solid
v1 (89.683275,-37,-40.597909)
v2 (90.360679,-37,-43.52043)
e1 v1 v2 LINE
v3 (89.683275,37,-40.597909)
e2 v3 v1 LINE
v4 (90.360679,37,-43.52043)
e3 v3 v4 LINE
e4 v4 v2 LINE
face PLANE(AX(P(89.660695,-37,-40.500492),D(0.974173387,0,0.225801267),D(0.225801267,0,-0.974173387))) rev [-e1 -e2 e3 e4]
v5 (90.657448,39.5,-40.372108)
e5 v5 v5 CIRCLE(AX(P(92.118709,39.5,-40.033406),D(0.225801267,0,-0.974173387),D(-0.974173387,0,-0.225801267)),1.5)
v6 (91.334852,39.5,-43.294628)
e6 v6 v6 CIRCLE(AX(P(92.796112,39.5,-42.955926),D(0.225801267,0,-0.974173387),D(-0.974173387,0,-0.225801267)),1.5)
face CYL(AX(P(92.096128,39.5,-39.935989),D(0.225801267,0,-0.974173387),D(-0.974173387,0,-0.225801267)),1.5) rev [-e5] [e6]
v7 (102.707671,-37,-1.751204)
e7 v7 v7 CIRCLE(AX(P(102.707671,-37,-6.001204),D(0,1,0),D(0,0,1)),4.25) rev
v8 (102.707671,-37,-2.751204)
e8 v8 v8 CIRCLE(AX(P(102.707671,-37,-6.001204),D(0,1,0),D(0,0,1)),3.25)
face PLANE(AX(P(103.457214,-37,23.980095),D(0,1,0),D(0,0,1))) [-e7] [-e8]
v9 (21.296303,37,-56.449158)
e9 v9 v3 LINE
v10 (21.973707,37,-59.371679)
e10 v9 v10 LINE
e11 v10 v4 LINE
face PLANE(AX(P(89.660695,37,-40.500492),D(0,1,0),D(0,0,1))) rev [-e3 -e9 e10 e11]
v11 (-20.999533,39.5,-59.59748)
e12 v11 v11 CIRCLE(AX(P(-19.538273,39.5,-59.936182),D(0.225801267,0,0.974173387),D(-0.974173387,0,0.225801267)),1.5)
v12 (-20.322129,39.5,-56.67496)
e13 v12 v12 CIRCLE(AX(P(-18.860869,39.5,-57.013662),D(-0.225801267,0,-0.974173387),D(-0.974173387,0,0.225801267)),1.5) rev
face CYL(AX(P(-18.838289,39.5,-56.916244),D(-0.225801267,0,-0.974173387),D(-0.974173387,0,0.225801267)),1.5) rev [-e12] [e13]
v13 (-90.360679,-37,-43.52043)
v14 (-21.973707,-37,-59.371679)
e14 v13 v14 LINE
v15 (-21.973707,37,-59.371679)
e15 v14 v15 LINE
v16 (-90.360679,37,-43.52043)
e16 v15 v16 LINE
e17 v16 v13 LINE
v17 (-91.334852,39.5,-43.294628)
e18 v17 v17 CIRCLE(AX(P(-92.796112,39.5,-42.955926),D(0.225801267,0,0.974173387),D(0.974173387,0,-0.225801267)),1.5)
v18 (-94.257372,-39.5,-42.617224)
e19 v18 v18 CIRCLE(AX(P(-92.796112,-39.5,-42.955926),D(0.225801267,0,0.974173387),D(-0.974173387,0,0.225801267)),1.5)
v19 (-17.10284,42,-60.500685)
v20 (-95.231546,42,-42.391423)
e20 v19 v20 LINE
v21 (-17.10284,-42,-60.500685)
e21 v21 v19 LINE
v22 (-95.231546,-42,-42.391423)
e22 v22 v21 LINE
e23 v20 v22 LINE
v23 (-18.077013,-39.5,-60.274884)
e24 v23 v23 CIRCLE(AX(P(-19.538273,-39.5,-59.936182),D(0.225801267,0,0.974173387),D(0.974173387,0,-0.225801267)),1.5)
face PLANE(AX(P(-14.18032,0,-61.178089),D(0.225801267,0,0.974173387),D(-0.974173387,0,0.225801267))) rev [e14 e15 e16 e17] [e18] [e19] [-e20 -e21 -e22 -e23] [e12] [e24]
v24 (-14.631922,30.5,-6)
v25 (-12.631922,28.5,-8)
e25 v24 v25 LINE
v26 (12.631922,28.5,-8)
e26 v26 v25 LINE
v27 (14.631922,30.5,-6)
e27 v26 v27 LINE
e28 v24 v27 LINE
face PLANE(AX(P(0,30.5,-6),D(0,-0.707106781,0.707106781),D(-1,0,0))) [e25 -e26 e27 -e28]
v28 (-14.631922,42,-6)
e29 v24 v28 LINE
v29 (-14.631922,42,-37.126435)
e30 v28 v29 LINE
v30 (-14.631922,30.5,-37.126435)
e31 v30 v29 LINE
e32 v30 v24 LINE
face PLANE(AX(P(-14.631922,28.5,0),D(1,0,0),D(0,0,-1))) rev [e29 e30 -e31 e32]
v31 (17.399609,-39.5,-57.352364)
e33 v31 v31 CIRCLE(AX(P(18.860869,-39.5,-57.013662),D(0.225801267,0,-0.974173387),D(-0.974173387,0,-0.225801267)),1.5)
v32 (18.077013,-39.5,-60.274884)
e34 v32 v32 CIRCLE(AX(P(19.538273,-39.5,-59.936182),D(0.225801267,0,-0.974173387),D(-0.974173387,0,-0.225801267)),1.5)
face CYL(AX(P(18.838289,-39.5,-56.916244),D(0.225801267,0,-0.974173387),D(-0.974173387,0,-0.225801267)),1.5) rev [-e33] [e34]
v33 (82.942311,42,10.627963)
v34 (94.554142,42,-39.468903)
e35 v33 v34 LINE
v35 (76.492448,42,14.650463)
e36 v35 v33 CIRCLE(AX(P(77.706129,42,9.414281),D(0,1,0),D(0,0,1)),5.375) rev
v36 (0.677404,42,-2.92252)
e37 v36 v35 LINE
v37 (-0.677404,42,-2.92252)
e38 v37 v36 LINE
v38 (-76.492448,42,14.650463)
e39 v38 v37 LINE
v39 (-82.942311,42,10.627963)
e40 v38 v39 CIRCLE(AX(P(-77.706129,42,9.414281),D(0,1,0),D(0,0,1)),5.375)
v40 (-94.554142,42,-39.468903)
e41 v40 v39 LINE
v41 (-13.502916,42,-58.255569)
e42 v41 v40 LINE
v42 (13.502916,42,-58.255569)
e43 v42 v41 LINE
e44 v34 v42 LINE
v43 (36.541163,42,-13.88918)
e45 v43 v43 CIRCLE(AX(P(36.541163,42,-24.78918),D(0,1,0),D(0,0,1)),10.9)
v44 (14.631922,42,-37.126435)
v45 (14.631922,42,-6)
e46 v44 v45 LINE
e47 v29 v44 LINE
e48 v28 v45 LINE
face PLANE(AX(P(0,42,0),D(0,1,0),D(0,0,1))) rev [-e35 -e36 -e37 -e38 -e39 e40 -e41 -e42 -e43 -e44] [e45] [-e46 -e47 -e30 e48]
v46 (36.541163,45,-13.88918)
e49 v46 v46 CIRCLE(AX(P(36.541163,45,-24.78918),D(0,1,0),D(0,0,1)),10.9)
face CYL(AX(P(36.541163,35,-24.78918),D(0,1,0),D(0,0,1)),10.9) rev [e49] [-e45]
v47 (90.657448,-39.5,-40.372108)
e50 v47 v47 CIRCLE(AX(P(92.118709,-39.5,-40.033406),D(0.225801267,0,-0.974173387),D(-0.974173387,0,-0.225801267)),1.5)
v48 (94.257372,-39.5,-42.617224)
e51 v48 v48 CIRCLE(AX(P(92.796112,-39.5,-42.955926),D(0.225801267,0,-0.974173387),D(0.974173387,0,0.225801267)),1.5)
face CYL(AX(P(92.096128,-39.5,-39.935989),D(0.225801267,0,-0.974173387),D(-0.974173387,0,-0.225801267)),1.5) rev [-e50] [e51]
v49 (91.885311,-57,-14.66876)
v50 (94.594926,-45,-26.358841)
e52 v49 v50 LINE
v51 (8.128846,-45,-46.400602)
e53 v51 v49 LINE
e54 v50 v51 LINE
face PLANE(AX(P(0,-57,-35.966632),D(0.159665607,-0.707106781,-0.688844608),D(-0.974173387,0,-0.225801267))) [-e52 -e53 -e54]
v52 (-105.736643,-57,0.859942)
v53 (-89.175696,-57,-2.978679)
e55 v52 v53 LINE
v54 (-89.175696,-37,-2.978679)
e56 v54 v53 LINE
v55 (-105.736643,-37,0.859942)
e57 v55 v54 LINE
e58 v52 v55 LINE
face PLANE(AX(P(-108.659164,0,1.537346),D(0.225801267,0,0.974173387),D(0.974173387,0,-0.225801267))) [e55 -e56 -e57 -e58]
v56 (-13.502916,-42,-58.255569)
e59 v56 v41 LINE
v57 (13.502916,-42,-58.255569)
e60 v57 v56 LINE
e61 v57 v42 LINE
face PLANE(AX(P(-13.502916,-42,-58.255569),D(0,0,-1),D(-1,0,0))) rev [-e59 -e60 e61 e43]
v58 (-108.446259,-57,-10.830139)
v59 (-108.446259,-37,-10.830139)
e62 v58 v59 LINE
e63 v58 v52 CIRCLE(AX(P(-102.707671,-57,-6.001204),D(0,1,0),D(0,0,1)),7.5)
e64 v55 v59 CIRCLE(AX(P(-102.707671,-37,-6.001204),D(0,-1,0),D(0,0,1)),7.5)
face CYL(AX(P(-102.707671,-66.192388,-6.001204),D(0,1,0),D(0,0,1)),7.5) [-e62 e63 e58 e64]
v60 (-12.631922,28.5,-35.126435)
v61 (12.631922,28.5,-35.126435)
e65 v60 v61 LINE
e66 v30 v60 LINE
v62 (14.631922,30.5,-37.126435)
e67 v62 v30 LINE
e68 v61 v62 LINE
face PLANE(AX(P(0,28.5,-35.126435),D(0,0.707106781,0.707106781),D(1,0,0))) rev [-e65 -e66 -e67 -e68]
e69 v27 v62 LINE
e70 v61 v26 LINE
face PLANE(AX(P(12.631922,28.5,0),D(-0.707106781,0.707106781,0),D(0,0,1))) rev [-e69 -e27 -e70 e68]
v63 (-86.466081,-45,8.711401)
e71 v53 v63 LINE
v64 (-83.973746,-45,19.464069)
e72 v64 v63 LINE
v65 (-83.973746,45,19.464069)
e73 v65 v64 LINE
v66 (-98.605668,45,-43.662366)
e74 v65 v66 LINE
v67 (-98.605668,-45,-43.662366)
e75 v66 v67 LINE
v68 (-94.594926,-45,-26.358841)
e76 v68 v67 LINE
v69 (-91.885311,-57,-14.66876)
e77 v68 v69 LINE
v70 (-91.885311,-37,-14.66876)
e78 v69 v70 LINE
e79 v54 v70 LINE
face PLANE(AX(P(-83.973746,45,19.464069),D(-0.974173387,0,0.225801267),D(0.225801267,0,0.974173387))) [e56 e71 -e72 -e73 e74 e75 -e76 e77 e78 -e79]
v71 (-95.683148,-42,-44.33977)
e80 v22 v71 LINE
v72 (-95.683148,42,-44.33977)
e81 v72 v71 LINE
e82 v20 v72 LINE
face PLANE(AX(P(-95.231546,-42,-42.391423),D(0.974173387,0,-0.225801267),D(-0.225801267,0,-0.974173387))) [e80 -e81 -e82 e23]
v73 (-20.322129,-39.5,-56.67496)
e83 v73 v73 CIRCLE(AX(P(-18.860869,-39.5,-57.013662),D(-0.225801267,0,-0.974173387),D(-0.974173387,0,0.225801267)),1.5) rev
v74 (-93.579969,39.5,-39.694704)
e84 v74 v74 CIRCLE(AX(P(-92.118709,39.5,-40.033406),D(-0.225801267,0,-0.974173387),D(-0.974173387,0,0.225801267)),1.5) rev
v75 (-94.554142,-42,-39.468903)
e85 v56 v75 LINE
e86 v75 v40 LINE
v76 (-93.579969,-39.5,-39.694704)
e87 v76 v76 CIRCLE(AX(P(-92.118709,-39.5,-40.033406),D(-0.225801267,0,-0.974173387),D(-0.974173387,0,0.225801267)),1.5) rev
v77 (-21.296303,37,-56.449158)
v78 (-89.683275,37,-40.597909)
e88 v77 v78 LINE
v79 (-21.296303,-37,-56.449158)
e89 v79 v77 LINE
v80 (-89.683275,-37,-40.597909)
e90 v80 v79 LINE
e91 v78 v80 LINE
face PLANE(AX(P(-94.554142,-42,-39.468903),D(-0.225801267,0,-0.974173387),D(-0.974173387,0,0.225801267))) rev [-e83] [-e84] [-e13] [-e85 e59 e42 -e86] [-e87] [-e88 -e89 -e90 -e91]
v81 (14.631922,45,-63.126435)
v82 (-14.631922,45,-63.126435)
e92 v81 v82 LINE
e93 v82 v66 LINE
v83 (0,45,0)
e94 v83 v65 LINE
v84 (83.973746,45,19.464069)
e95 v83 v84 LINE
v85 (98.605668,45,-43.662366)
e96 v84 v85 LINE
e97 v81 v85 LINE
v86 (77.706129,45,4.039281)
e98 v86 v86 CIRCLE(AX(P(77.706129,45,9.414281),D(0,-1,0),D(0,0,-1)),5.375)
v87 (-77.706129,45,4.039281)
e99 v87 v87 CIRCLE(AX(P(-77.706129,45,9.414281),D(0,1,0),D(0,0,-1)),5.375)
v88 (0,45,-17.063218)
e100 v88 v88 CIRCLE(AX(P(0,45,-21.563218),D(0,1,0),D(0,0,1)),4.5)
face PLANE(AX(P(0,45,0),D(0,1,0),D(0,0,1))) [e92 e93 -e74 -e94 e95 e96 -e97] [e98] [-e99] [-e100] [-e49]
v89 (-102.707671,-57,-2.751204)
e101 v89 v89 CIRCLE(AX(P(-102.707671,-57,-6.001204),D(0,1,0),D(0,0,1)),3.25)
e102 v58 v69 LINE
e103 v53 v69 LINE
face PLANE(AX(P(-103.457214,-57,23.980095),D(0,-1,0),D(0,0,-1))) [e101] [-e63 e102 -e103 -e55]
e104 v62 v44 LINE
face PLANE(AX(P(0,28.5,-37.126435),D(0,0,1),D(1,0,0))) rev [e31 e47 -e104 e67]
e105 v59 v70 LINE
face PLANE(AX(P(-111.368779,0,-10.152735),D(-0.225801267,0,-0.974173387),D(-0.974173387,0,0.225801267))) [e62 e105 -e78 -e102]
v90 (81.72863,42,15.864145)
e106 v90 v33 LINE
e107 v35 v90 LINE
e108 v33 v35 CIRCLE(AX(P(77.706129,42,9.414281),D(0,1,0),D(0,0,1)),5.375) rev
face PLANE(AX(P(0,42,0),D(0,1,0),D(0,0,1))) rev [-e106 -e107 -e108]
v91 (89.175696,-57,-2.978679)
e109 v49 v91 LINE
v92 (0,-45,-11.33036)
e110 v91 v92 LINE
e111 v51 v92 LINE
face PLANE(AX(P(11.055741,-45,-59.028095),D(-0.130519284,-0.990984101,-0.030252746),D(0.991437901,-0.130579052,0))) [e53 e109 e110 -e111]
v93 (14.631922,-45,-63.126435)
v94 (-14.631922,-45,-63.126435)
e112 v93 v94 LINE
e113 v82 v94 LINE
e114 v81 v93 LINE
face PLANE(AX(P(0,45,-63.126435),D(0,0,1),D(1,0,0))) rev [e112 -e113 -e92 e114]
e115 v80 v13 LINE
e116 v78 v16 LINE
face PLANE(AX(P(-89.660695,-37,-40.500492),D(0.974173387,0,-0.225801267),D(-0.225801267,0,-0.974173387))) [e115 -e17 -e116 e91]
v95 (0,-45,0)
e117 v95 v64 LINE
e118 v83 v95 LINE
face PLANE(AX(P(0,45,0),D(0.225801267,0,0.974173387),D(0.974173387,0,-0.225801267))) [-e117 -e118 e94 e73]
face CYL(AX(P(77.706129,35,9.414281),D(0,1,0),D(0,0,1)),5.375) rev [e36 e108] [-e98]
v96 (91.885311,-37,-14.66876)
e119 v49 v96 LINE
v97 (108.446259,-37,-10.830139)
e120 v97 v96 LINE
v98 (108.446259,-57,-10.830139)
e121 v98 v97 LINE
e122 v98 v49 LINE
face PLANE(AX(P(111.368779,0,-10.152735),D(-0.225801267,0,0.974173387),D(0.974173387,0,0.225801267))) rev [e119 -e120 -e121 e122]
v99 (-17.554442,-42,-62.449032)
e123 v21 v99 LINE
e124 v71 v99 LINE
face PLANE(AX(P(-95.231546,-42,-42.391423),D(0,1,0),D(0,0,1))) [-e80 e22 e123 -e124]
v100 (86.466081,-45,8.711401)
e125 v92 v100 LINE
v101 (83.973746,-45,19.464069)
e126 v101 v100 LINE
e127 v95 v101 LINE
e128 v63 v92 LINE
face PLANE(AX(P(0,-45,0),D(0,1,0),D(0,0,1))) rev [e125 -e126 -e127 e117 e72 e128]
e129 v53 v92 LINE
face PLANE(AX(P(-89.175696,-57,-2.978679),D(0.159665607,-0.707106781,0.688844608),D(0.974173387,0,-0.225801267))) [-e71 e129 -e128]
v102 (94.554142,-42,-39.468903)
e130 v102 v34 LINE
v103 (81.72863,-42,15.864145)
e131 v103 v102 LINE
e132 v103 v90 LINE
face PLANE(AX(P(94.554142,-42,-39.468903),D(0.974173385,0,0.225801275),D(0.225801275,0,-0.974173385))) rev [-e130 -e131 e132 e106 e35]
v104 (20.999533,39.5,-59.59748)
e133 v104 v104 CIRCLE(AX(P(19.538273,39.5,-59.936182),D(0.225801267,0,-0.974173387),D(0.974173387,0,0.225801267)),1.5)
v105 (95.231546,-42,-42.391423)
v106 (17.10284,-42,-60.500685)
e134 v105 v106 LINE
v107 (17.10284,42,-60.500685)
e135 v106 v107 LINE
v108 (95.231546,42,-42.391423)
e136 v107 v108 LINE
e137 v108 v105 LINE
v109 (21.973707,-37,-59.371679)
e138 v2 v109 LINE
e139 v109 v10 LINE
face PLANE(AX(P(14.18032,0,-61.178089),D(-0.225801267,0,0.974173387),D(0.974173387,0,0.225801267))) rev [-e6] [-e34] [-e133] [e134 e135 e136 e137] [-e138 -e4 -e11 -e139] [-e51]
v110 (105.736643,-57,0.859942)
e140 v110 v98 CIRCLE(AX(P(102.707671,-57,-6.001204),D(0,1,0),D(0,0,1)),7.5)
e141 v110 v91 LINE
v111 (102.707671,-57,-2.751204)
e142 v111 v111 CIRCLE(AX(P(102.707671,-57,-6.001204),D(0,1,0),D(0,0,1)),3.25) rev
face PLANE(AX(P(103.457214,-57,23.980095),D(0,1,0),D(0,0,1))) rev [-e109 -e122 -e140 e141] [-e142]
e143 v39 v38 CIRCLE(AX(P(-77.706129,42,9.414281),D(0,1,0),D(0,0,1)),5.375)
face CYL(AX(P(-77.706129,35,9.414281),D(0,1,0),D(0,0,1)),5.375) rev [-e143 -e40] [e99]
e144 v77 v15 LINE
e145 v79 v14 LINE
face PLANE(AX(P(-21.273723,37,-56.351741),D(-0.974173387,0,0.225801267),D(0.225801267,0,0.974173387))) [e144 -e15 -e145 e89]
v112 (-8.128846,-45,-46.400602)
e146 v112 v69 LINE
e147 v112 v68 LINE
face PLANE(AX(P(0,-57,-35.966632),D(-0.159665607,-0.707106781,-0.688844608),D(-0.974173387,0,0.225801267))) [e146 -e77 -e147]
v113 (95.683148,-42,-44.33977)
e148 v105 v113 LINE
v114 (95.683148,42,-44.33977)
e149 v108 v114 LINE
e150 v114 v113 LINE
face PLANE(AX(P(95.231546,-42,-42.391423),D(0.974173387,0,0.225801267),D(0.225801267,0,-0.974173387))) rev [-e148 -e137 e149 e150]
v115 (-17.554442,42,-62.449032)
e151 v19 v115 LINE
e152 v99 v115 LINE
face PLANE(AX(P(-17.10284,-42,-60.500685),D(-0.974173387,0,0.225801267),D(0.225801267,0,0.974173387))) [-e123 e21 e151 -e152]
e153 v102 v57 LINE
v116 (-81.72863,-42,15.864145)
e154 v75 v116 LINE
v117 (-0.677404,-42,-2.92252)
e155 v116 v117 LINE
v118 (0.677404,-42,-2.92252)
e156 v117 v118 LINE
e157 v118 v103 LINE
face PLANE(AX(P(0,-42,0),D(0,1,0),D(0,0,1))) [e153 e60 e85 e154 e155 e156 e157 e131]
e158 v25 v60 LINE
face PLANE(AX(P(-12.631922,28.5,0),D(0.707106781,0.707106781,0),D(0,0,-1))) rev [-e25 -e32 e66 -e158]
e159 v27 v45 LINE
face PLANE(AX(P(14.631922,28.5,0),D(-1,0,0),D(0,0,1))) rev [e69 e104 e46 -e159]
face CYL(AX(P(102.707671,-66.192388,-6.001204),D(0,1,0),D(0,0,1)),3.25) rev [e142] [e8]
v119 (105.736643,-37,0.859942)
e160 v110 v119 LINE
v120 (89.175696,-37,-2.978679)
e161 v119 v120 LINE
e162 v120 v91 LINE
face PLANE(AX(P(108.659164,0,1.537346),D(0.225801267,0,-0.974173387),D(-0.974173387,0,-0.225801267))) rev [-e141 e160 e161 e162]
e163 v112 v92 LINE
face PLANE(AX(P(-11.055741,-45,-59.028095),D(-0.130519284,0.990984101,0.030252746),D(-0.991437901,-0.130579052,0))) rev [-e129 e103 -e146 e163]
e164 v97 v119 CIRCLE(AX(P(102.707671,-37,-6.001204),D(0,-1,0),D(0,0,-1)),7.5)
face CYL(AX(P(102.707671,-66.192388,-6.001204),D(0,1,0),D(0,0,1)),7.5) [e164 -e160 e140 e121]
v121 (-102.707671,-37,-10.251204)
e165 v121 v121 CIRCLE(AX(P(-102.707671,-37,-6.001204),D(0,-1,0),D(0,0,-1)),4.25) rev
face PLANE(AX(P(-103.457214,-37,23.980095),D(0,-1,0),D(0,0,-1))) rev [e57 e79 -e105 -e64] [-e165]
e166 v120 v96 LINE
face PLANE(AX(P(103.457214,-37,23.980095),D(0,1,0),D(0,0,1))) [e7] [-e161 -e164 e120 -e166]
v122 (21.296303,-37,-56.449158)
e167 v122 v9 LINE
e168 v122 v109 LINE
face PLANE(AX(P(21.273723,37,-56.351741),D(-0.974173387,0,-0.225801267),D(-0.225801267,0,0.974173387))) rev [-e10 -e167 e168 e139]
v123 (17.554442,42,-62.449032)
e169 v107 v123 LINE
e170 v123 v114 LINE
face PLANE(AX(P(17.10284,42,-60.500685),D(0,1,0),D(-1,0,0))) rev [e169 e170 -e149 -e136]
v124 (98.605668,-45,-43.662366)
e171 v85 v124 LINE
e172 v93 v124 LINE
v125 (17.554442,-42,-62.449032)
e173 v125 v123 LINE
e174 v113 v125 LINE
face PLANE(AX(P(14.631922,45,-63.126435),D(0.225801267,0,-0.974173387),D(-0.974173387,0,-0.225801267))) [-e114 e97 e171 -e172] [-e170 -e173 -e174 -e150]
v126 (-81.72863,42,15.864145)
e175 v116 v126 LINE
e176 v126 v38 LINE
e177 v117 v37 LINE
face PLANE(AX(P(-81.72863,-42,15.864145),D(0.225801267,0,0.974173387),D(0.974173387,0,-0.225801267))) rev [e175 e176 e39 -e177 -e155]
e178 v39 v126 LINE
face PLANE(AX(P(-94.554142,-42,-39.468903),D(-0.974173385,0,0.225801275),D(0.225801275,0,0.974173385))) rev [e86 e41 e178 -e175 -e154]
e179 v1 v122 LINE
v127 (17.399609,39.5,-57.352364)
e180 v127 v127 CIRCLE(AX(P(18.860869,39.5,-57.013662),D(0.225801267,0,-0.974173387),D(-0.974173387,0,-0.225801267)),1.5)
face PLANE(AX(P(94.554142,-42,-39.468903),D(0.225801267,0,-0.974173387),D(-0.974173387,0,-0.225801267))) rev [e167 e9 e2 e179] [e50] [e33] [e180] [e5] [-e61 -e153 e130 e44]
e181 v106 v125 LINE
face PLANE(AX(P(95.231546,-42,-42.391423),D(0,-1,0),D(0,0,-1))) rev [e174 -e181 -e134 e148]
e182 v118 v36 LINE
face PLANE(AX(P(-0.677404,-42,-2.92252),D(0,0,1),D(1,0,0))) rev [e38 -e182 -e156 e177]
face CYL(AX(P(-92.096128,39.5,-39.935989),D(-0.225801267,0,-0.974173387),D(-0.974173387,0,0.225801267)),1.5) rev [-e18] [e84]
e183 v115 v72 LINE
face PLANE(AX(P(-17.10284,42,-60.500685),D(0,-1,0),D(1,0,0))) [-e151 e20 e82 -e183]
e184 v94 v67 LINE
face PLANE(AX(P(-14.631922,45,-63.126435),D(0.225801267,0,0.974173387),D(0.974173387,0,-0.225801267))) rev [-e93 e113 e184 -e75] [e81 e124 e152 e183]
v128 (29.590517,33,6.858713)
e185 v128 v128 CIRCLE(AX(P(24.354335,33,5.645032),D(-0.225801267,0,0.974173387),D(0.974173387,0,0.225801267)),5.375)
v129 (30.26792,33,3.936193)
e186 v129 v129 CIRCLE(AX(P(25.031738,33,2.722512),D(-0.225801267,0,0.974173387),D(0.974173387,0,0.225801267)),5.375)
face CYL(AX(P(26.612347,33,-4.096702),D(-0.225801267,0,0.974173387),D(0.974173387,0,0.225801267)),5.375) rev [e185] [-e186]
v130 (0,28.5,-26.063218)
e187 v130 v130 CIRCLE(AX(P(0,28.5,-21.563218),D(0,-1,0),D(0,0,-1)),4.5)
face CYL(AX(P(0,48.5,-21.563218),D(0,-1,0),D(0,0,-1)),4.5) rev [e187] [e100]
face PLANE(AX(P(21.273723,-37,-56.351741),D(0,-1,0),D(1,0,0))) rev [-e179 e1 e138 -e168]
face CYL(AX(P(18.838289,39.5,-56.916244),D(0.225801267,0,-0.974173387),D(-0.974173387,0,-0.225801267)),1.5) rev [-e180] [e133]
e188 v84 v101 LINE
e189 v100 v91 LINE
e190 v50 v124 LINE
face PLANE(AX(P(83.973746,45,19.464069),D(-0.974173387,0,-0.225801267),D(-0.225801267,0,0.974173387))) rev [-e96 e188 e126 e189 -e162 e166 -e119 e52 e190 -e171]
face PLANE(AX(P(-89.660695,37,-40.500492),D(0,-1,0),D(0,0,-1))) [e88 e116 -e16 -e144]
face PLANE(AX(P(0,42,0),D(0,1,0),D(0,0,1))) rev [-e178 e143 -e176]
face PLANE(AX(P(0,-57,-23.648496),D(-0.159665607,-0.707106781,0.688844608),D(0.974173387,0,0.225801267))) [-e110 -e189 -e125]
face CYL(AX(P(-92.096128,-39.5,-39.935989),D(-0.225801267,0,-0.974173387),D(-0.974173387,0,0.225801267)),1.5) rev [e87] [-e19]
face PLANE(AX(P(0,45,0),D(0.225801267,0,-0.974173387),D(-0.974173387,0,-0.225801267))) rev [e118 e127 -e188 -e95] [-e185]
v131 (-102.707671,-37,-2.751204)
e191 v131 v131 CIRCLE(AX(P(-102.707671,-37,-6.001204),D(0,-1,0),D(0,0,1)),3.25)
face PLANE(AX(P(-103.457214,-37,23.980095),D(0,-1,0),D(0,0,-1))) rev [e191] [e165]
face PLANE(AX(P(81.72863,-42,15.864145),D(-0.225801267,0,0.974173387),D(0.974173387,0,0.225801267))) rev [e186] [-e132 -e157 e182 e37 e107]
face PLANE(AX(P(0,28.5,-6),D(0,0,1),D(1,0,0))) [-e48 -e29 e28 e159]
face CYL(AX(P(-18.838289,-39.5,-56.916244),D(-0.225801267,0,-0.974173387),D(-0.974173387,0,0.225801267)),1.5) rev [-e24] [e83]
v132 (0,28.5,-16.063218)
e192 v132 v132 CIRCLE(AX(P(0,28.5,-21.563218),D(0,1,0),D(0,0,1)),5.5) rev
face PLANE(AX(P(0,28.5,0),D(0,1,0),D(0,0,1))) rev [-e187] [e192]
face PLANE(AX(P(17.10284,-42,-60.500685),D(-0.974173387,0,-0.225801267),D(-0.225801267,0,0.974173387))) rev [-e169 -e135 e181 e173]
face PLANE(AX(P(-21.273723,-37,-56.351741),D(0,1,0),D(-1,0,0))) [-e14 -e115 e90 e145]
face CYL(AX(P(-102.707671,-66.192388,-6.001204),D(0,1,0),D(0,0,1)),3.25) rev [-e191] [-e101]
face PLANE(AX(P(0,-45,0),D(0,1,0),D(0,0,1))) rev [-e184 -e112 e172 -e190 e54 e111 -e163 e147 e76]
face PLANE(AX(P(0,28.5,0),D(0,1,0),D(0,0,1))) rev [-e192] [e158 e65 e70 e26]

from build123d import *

# Parameters (mm, degrees)
EXTERNAL_DIMENSIONS_DEPTH             = 45
INTERNAL_CAVITY_DEPTH                 = 42
SKETCH5_W                             = 80.200000486
SKETCH5_H                             = 84.000000972
FIRST_CUTOUT_DEPTH                    = 2
SKETCH6_R                             = 1.5
SKETCH6_W                             = 70.200000486
SKETCH6_H                             = 74.000000972
SECOND_CUTOUT_HOLES_FOR_INSERTS_DEPTH = 3.1
SKETCH8_W                             = 29.263844186
SKETCH8_H                             = 31.126435476
TOPATTACHMENTSUPPORT_DEPTH            = 15
TOPATTACHMENT_SIZE                    = 2
TOP_HOLE_DEPTH                        = 20
BOTTOMSUPPORT_DEPTH                   = 12
CHAMFER1_SIZE                         = 12
LEFTCUT_DEPTH                         = 60
EXTRACUT_DEPTH                        = 100
SKETCH18_W                            = 12
SKETCH18_H                            = 20
BOTTOMATTACHMENT_DEPTH                = 20
BOTTOM_ATTACHMENT_ROUNDING_REACH      = 154.026
SKETCH19_R                            = 3.25
SKETCH20_R                            = 5.375
WIREEXIT_DEPTH                        = 10
SKETCH23_R                            = 5.375
CHARGERPORT_DEPTH                     = 10
SKETCH29_R                            = 10.9
CUT_EXTRUDE1_DEPTH                    = 10


with BuildPart() as part:
    # Sketch1 → External Dimensions (new, symmetric)
    with BuildSketch(Plane(origin=(0, 0, 0), x_dir=(1, 0, 0), z_dir=(0, 1, 0))):
        Polygon((0, 0), (83.973745957, -19.464069204), (98.60566805, 43.662366272), (14.631922093, 63.126435476), (-14.631922093, 63.126435476), (-98.60566805, 43.662366272), (-83.973745957, -19.464069204), align=None)
    extrude(amount=EXTERNAL_DIMENSIONS_DEPTH, both=True)

    # Sketch4 → Internal Cavity (cut, symmetric)
    with BuildSketch(Plane(origin=(0, 0, 0), x_dir=(1, 0, 0), z_dir=(0, 1, 0))):
        Polygon((-0.677403801, 2.922520161), (0.677403801, 2.922520161), (81.728629596, -15.864145243), (94.554142028, 39.468903028), (13.502915759, 58.255568541), (-13.502915759, 58.255568541), (-94.554142028, 39.468903028), (-81.728629596, -15.864145243), align=None)
    extrude(amount=INTERNAL_CAVITY_DEPTH, both=True, mode=Mode.SUBTRACT)

    # Sketch5 → First Cutout (cut)
    with BuildSketch(Plane(origin=(14.631922093, 0, -63.126435476), x_dir=(-0.9741733869698493, 0, -0.22580126686910412), z_dir=(0.22580126686910412, 0, -0.9741733869698493))):
        with Locations((-43.100000243, 0)):
            Rectangle(SKETCH5_W, SKETCH5_H)
    first_cutout = extrude(amount=-FIRST_CUTOUT_DEPTH, mode=Mode.SUBTRACT)

    # Sketch6 → Second Cutout + Holes for Inserts (cut)
    with BuildSketch(Plane(origin=(14.180319559, 0, -61.178088702), x_dir=(-0.9741733869698493, 0, -0.2258012668691041), z_dir=(0.2258012668691041, 0, -0.9741733869698493))):
        with Locations((-80.700000486, 39.500000486)):
            Circle(SKETCH6_R)
        with Locations((-5.499999514, 39.500000486)):
            Circle(SKETCH6_R)
        with Locations((-5.499999514, -39.500000486)):
            Circle(SKETCH6_R)
        with Locations((-80.700000486, -39.500000486)):
            Circle(SKETCH6_R)
        with Locations((-43.100000243, 0)):
            Rectangle(SKETCH6_W, SKETCH6_H)
    second_cutout_holes_for_inserts = extrude(amount=-SECOND_CUTOUT_HOLES_FOR_INSERTS_DEPTH, mode=Mode.SUBTRACT)

    # Mirror1: First Cutout, Second Cutout + Holes for Inserts across plane
    add(first_cutout.mirror(Plane(origin=(0, 0, 0), x_dir=(0, 0, 1), z_dir=(1, 0, 0))), mode=Mode.SUBTRACT)
    add(second_cutout_holes_for_inserts.mirror(Plane(origin=(0, 0, 0), x_dir=(0, 0, 1), z_dir=(1, 0, 0))), mode=Mode.SUBTRACT)

    # Sketch8 → TopAttachmentSupport (add)
    with BuildSketch(Plane(origin=(0, 43.5, 0), x_dir=(1, 0, 0), z_dir=(0, 1, 0))):
        with Locations((0, 21.563217738)):
            Rectangle(SKETCH8_W, SKETCH8_H)
    extrude(amount=-TOPATTACHMENTSUPPORT_DEPTH)

    # TopAttachment
    topattachment_edges = [part.edges().sort_by_distance(p)[0] for p in [
        (0, 28.5, -6),
        (0, 28.5, -37.126435476),
        (14.631922093, 28.5, -21.563217738),
        (-14.631922093, 28.5, -21.563217738),
    ]]
    chamfer(topattachment_edges, length=TOPATTACHMENT_SIZE)

    # Sketch9 → Top Hole (cut)
    with BuildSketch(Plane(origin=(0, 28.5, 0), x_dir=(-1, 0, 0), z_dir=(0, -1, 0))):
        with BuildLine():
            ThreePointArc((4.5, 21.563217738), (3.181980515, 24.745198253), (0, 26.063217738))
            Line((0, 26.063217738), (0, 17.063217738))
            ThreePointArc((0, 17.063217738), (3.181980515, 18.381237222), (4.5, 21.563217738))
        make_face()
        with BuildLine():
            Line((0, 17.063217738), (0, 26.063217738))
            ThreePointArc((0, 26.063217738), (-4.5, 21.563217738), (0, 17.063217738))
        make_face()
    extrude(amount=-TOP_HOLE_DEPTH, mode=Mode.SUBTRACT)

    # Sketch10 → BottomSupport (add)
    with BuildSketch(Plane.XZ.offset(45)):
        Polygon((-89.175695767, -2.978679395), (0, -23.648495823), (89.175695767, -2.978679395), (91.88531097, -14.668760038), (0, -35.966631548), (-91.88531097, -14.668760038), align=None)
    extrude(amount=BOTTOMSUPPORT_DEPTH)

    # Chamfer1
    chamfer1_edges = [part.edges().sort_by_distance(p)[0] for p in [
        (45.942655485, -45, -25.317695793),
        (44.587847884, -45, -13.313587609),
        (-44.587847884, -45, -13.313587609),
        (-45.942655485, -45, -25.317695793),
    ]]
    chamfer(chamfer1_edges, length=CHAMFER1_SIZE - 0.0001)  # a hair under: the kernel refuses the full size

    # Sketch14 → LeftCut (cut)
    with BuildSketch(Plane(origin=(0, 0, 0), x_dir=(0.9741733869698491, 0, -0.22580126686910457), z_dir=(0.22580126686910457, 0, 0.9741733869698491))):
        Polygon((2.558409664, -45), (-86.2, -57), (5.339860316, -57), align=None)
    leftcut = extrude(amount=-LEFTCUT_DEPTH, mode=Mode.SUBTRACT)

    # Mirror2: LeftCut across plane
    add(leftcut.mirror(Plane(origin=(0, 0, 0), x_dir=(0, 0, 1), z_dir=(1, 0, 0))), mode=Mode.SUBTRACT)

    # Sketch17 → ExtraCut (cut)
    with BuildSketch(Plane.XZ.offset(45)):
        Polygon((0, -11.330360098), (8.128845607, -46.400602029), (0, -48.284767272), (-8.128845607, -46.400602029), align=None)
    extrude(amount=EXTRACUT_DEPTH, mode=Mode.SUBTRACT)

    # Sketch18 → BottomAttachment (add)
    with BuildSketch(Plane(origin=(83.973745957, 0, 19.464069204), x_dir=(0.22580126686910407, 0, -0.9741733869698493), z_dir=(0.9741733869698493, 0, 0.22580126686910407))):
        with Locations((29.037735273, -47)):
            Rectangle(SKETCH18_W, SKETCH18_H)
    bottomattachment = extrude(amount=BOTTOMATTACHMENT_DEPTH)

    # Sketch19 → Bottom Attachment Rounding (cut, up to next)
    with BuildSketch(Plane(origin=(0, -37, 0), x_dir=(1, 0, 0), z_dir=(0, 1, 0)), mode=Mode.PRIVATE) as bottom_attachment_rounding_sk1:
        with Locations(Location((102.707670706, 6.001203881, 0), (0, 0, 270))):
            Circle(SKETCH19_R)
    bottom_attachment_rounding_tool1 = extrude(bottom_attachment_rounding_sk1.sketch, amount=-BOTTOM_ATTACHMENT_ROUNDING_REACH, mode=Mode.PRIVATE) & part.part
    # Sketch19 → Bottom Attachment Rounding (cut, up to next)
    with BuildSketch(Plane(origin=(0, -37, 0), x_dir=(1, 0, 0), z_dir=(0, 1, 0)), mode=Mode.PRIVATE) as bottom_attachment_rounding_sk2:
        with BuildLine():
            ThreePointArc((110.013971108, 4.307694379), (109.999984924, 7.753959807), (108.446258548, 10.830138501))
            Line((108.446258548, 10.830138501), (111.368778709, 10.152734701))
            Line((111.368778709, 10.152734701), (110.013971108, 4.307694379))
        make_face()
    bottom_attachment_rounding_tool2 = extrude(bottom_attachment_rounding_sk2.sketch, amount=-BOTTOM_ATTACHMENT_ROUNDING_REACH, mode=Mode.PRIVATE) & part.part
    # Sketch19 → Bottom Attachment Rounding (cut, up to next)
    with BuildSketch(Plane(origin=(0, -37, 0), x_dir=(1, 0, 0), z_dir=(0, 1, 0)), mode=Mode.PRIVATE) as bottom_attachment_rounding_sk3:
        with BuildLine():
            Line((110.013971108, 4.307694379), (108.659163507, -1.537345943))
            Line((108.659163507, -1.537345943), (105.736643346, -0.859942142))
            ThreePointArc((105.736643346, -0.859942142), (108.485263978, 1.219006062), (110.013971108, 4.307694379))
        make_face()
    bottom_attachment_rounding_tool3 = extrude(bottom_attachment_rounding_sk3.sketch, amount=-BOTTOM_ATTACHMENT_ROUNDING_REACH, mode=Mode.PRIVATE) & part.part
    bottom_attachment_rounding_1 = bottom_attachment_rounding_tool1.solids().sort_by_distance((102.707671, -37, -6.001204))[0]
    add(bottom_attachment_rounding_1, mode=Mode.SUBTRACT)
    bottom_attachment_rounding_2 = bottom_attachment_rounding_tool2.solids().sort_by_distance((110.209545, -37, -8.949999))[0]
    add(bottom_attachment_rounding_2, mode=Mode.SUBTRACT)
    bottom_attachment_rounding_3 = bottom_attachment_rounding_tool3.solids().sort_by_distance((108.14727, -37, -0.052736))[0]
    add(bottom_attachment_rounding_3, mode=Mode.SUBTRACT)
    bottom_attachment_rounding = bottom_attachment_rounding_1 + bottom_attachment_rounding_2 + bottom_attachment_rounding_3  # Bottom Attachment Rounding as one shape, for the pattern or mirror that repeats it

    # Mirror3: BottomAttachment, Bottom Attachment Rounding across plane
    add(bottomattachment.mirror(Plane(origin=(0, 0, 0), x_dir=(0, 0, 1), z_dir=(1, 0, 0))))
    add(bottom_attachment_rounding.mirror(Plane(origin=(0, 0, 0), x_dir=(0, 0, 1), z_dir=(1, 0, 0))), mode=Mode.SUBTRACT)

    # Sketch20 → WireExit (cut)
    with BuildSketch(Plane(origin=(40.135943543, 45, 9.303012195), x_dir=(0.22580126686910407, 0, -0.9741733869698493), z_dir=(0, -1, 0))):
        with Locations(Location((8.375, 36.625, 0), (0, 0, 180))):
            Circle(SKETCH20_R)
    wireexit = extrude(amount=WIREEXIT_DEPTH, mode=Mode.SUBTRACT)

    # Mirror4: WireExit across plane
    add(wireexit.mirror(Plane(origin=(0, 0, 0), x_dir=(0, 0, 1), z_dir=(1, 0, 0))), mode=Mode.SUBTRACT)

    # Sketch23 → ChargerPort (cut)
    with BuildSketch(Plane(origin=(0, 0, 0), x_dir=(0.9741733869698492, 0, 0.22580126686910437), z_dir=(-0.22580126686910437, 0, 0.9741733869698492))):
        with Locations((25, 33)):
            Circle(SKETCH23_R)
    extrude(amount=-CHARGERPORT_DEPTH, mode=Mode.SUBTRACT)

    # Sketch29 → Cut-Extrude1 (cut)
    with BuildSketch(Plane(origin=(0, 45, 0), x_dir=(1, 0, 0), z_dir=(0, 1, 0))):
        with Locations(Location((36.541162656, 24.789179732, 0), (0, 0, 270))):
            Circle(SKETCH29_R)
    extrude(amount=-CUT_EXTRUDE1_DEPTH, mode=Mode.SUBTRACT)


solid = part.part
